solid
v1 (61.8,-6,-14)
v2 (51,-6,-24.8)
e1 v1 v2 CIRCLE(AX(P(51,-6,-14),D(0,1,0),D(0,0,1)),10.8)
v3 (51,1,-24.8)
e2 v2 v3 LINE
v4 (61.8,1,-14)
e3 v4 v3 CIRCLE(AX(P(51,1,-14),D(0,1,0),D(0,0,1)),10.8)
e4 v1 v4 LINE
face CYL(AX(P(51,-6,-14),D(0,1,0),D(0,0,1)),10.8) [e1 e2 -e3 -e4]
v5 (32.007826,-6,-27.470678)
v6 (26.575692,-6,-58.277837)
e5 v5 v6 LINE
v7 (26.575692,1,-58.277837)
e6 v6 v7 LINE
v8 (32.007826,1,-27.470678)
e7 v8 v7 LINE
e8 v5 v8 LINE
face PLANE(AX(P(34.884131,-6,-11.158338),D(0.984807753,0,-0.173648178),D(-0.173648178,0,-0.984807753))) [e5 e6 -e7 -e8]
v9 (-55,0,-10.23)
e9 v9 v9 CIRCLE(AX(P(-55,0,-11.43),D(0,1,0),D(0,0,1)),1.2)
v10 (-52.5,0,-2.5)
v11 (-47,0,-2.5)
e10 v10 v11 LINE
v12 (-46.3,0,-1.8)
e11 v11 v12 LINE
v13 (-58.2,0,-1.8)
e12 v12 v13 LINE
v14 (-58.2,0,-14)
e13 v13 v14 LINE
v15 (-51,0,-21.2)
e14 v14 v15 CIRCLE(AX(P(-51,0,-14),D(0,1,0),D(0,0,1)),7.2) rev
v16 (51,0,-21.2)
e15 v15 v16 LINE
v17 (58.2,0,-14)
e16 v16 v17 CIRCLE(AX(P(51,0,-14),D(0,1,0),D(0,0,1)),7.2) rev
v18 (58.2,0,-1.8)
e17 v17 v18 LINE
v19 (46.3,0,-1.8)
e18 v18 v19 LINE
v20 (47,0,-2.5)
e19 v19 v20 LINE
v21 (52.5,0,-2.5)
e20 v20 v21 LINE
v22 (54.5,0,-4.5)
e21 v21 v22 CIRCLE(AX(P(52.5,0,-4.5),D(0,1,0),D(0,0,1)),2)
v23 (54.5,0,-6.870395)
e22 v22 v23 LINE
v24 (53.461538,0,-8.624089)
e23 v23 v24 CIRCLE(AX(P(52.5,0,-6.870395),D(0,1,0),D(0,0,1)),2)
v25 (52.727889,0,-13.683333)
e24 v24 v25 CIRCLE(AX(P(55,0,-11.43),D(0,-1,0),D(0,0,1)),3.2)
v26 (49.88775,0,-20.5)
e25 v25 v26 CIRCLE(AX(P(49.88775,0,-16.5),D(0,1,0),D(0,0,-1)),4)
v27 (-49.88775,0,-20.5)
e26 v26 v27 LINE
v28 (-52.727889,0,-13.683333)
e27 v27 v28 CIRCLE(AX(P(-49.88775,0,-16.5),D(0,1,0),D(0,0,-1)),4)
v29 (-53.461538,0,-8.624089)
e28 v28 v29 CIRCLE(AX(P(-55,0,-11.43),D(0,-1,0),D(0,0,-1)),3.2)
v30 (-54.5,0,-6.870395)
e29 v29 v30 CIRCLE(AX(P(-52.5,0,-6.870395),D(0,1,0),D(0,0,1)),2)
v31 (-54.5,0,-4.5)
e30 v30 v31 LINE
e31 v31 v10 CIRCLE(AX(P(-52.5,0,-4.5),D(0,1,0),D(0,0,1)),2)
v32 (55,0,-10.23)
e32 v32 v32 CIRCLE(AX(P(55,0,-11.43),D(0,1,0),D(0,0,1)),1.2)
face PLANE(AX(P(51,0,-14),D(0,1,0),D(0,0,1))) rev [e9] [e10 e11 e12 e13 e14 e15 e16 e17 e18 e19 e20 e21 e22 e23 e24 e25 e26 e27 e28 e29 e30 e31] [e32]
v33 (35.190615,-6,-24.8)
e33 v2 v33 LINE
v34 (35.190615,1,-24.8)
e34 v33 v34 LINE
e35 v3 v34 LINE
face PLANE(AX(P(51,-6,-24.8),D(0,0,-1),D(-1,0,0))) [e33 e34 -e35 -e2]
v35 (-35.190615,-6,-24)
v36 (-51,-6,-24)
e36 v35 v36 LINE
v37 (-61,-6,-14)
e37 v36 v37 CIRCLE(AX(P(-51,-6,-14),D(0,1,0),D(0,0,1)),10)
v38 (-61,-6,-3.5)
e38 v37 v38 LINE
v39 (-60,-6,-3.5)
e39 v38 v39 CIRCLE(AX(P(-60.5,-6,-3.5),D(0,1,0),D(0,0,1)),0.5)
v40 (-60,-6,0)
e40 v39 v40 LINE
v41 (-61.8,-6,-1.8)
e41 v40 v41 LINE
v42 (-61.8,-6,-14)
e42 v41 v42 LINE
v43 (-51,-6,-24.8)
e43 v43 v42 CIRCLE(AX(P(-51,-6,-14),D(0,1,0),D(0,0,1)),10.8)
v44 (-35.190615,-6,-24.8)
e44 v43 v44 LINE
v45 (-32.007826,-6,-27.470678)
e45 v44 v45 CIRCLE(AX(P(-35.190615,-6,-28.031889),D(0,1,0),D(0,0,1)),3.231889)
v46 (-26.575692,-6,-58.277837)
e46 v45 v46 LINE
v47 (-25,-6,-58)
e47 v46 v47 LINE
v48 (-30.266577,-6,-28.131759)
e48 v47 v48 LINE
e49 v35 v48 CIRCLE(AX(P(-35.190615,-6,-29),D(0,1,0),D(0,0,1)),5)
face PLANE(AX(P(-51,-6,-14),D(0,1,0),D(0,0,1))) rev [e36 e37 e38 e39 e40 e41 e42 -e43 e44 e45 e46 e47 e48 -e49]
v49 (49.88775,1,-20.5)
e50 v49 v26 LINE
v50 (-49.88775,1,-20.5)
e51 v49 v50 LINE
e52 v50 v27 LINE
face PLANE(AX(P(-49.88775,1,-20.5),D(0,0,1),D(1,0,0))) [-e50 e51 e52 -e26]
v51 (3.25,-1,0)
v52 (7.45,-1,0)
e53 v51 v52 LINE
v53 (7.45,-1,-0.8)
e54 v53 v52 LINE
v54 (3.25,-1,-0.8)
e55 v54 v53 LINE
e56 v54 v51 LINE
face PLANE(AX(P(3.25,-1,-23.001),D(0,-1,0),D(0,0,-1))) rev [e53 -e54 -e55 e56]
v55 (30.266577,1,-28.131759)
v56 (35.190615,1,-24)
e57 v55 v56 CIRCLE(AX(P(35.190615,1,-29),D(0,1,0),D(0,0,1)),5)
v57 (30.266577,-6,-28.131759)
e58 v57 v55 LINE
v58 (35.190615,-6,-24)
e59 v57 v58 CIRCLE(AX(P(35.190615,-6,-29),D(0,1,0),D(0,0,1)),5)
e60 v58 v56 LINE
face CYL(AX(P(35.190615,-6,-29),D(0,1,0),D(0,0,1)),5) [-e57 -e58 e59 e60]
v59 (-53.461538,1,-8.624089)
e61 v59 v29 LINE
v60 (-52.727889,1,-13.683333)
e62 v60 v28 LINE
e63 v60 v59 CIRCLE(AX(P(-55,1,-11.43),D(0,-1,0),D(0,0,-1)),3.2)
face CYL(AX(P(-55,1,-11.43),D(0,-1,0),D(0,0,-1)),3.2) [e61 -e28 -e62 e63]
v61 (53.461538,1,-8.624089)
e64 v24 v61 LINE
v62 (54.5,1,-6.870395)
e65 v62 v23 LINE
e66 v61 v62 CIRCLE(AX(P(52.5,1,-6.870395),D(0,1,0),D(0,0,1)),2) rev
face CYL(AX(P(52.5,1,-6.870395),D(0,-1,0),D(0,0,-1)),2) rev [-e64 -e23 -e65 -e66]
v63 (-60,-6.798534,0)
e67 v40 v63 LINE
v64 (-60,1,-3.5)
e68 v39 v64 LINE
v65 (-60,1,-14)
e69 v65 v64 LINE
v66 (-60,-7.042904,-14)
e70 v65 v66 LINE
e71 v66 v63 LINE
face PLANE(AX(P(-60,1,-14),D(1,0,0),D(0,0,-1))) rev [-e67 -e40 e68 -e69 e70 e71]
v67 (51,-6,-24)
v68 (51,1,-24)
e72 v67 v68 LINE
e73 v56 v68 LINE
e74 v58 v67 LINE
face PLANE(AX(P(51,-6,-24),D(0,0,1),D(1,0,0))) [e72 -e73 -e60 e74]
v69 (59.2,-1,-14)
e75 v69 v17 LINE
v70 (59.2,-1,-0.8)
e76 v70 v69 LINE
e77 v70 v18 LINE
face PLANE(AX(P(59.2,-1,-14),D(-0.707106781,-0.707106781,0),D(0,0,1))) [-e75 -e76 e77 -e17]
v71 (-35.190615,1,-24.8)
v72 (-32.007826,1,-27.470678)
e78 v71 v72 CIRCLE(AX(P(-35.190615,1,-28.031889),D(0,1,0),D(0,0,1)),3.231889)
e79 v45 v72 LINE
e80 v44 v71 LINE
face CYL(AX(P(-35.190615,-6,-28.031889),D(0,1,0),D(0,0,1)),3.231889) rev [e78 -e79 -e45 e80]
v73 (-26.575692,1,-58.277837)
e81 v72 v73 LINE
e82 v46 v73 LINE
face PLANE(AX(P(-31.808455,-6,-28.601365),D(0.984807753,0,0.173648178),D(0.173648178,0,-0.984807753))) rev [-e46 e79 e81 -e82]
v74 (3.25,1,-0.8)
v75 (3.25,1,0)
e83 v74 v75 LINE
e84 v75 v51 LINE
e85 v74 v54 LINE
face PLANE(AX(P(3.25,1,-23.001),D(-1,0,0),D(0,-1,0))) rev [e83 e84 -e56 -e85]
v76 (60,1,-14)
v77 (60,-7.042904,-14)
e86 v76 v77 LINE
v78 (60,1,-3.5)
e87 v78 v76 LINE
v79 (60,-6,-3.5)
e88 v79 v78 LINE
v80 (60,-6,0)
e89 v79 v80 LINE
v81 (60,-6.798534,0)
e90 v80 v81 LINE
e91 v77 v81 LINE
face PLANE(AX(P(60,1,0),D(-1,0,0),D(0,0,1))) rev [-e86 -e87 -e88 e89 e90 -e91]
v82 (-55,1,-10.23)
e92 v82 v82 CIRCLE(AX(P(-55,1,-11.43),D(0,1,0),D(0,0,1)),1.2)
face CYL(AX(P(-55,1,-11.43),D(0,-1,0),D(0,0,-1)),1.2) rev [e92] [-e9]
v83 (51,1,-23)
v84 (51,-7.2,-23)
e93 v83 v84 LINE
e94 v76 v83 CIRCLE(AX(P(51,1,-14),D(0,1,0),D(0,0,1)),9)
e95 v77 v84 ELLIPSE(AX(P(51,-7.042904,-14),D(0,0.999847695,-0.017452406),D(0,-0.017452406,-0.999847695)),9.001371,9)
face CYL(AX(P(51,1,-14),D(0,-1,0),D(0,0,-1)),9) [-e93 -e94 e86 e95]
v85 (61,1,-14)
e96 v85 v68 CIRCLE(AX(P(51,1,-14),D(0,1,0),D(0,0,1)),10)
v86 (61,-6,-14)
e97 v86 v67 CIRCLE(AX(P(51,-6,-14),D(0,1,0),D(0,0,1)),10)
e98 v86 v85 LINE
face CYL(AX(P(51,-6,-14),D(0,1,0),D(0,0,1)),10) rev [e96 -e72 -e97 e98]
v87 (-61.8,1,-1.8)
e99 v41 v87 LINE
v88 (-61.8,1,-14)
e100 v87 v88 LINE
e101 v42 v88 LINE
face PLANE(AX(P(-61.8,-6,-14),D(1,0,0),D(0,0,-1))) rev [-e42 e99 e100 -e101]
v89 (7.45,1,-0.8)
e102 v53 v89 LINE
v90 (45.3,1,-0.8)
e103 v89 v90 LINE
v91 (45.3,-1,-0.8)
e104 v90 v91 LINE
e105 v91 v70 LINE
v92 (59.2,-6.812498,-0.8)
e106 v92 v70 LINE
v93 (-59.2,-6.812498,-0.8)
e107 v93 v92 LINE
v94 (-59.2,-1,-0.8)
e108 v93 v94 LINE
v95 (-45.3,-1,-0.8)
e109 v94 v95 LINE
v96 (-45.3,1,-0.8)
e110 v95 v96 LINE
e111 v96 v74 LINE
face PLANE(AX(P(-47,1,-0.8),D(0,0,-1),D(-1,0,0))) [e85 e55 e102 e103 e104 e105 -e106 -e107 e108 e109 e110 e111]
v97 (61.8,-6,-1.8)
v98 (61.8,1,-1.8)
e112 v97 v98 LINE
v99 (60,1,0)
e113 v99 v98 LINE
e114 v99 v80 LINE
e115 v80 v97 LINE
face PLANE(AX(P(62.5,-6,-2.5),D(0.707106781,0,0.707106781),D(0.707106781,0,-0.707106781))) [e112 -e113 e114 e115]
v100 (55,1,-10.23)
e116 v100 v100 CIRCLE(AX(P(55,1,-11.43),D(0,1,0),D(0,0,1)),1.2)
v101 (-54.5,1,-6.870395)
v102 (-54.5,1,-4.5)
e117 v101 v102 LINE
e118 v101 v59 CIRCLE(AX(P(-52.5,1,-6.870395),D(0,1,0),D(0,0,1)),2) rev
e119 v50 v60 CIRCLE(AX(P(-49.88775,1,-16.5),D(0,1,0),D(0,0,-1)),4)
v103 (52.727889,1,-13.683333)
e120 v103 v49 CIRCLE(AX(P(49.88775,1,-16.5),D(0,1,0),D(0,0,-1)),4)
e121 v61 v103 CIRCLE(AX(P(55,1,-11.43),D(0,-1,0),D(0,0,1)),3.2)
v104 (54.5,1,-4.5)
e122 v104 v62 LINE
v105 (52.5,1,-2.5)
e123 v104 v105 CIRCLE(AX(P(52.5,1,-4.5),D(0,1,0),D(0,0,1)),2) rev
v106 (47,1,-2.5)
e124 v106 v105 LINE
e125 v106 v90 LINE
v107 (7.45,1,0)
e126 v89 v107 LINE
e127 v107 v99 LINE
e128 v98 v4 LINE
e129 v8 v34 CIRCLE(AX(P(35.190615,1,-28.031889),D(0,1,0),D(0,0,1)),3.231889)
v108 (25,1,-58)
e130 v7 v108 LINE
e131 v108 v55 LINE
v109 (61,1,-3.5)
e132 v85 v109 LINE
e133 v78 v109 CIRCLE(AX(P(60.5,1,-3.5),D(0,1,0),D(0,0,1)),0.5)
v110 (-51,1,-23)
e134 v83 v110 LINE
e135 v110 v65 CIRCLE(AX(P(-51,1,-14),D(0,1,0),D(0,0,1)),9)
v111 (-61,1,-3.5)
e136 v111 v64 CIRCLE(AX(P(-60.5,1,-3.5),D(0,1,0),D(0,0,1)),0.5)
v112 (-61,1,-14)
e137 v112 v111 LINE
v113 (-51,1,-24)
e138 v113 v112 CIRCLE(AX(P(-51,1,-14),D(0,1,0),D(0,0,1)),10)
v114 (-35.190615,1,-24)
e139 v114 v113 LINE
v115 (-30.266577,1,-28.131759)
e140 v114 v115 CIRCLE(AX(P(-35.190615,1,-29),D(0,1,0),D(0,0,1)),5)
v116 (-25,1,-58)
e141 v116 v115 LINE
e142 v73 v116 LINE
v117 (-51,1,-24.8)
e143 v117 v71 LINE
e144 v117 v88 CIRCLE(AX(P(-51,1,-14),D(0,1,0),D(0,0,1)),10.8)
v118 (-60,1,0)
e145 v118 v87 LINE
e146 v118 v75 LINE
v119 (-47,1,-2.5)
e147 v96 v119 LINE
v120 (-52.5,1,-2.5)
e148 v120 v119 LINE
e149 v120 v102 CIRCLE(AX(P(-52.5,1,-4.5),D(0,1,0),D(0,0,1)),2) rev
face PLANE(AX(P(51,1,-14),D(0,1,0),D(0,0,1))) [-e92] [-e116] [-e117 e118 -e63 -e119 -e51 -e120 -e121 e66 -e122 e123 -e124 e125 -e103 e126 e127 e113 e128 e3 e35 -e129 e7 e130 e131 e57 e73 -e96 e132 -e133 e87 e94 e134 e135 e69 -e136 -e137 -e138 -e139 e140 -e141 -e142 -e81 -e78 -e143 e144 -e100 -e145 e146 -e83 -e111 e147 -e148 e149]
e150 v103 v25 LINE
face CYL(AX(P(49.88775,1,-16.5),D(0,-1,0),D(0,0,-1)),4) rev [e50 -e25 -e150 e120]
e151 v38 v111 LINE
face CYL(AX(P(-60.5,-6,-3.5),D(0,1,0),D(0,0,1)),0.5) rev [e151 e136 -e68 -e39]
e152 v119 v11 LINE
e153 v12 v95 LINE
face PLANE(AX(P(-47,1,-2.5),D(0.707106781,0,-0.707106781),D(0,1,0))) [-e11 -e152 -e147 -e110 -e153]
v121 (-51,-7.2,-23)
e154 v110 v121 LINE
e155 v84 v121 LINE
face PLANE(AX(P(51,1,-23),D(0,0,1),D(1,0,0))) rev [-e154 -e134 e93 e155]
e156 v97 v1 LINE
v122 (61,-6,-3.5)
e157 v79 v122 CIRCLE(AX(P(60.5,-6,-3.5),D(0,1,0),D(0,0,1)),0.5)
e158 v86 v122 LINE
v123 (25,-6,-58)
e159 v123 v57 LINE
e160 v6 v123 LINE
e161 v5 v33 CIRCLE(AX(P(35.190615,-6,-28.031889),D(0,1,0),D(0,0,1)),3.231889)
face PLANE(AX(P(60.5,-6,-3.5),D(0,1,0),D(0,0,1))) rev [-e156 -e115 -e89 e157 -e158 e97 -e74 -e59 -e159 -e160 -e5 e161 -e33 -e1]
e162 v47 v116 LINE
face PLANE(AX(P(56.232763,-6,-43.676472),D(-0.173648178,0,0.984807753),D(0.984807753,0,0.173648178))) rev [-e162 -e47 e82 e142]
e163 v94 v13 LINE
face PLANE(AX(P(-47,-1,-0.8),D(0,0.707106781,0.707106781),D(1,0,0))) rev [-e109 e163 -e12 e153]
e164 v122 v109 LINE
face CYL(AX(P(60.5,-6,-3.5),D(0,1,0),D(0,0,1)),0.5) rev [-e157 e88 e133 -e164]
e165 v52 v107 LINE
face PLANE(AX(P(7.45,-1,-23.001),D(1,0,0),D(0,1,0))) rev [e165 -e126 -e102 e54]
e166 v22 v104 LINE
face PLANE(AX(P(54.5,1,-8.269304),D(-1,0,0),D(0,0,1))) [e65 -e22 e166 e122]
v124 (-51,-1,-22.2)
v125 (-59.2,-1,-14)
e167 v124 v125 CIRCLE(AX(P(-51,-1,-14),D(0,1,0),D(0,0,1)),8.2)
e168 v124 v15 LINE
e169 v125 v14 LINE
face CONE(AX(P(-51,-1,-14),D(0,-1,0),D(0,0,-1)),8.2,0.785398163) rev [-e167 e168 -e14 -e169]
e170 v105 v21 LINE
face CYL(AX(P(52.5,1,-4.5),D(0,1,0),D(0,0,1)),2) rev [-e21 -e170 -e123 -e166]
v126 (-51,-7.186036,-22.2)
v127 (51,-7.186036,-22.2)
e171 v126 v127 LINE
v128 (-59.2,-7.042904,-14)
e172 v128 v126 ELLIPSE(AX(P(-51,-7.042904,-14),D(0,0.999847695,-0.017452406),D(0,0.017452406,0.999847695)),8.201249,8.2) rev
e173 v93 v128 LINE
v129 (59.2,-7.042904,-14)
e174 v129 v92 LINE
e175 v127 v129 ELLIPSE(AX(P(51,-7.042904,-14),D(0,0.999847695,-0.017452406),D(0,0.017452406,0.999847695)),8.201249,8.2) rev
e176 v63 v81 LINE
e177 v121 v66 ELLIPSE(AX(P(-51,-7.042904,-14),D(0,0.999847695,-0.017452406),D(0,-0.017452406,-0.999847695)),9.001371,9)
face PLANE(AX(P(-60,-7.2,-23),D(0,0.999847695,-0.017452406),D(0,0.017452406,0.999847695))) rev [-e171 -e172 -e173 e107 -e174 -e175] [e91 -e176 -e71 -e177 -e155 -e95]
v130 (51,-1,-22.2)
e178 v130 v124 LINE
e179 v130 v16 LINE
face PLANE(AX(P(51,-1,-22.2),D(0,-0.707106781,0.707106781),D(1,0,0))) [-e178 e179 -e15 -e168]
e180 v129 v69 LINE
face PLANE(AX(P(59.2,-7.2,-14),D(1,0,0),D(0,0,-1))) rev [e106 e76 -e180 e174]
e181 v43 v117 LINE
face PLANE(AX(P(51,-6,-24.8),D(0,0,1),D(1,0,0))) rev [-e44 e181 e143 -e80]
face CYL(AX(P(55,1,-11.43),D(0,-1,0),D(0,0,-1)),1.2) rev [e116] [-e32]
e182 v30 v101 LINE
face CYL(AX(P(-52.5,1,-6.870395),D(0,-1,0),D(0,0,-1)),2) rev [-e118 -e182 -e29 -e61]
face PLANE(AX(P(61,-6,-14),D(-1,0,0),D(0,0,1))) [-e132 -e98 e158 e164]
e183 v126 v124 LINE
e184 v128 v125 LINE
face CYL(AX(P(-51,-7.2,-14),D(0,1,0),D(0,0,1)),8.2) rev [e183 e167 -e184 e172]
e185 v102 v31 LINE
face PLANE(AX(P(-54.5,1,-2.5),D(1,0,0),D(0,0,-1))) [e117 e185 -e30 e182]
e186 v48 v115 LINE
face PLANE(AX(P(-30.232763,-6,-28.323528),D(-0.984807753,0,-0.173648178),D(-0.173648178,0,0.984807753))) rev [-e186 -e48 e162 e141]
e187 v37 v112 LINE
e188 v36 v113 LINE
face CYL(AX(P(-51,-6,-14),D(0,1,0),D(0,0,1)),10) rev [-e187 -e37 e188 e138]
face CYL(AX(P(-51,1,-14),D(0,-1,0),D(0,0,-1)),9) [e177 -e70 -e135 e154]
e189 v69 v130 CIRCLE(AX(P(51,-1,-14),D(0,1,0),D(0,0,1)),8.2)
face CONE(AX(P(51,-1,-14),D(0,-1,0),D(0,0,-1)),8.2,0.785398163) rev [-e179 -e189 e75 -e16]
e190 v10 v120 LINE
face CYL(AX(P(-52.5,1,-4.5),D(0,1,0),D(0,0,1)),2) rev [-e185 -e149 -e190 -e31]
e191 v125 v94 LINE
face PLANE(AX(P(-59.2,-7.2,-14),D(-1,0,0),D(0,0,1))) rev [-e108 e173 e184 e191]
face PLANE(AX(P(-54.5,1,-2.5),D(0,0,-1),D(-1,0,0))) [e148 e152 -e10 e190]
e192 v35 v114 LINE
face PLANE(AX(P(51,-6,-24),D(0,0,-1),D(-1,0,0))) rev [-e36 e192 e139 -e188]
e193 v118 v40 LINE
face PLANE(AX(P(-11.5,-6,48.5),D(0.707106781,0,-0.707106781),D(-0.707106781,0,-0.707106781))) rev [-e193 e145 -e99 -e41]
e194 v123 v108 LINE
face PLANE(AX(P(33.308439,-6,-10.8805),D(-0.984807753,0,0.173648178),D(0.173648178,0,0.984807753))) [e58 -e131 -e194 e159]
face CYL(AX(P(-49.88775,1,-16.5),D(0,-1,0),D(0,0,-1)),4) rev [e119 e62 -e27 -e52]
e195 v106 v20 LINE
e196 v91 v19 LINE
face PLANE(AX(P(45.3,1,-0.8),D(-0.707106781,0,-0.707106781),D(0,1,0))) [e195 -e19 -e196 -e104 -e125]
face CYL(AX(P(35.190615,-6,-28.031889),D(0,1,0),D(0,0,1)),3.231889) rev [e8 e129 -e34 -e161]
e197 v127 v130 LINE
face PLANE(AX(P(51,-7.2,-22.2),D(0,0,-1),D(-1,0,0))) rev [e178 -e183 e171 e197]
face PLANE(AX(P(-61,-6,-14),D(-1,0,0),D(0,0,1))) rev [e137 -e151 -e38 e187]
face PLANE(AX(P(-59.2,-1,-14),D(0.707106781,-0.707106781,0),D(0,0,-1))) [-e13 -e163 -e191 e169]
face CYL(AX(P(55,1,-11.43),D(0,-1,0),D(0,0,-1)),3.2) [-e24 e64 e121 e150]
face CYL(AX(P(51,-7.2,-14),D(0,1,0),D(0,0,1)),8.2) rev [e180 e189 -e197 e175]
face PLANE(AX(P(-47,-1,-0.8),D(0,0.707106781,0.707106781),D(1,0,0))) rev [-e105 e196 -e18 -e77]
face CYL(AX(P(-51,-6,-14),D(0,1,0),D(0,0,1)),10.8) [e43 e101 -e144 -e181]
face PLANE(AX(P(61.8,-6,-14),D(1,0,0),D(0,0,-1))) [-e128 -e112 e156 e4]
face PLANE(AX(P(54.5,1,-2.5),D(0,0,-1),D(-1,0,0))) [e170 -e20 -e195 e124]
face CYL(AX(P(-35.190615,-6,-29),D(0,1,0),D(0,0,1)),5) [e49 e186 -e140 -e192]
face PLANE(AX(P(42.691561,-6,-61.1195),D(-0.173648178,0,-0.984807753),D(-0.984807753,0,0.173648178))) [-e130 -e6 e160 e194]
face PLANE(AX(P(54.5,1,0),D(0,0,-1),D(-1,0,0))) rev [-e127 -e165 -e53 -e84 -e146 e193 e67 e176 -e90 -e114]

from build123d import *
from build123d.topology import SkipClean

# Parameters (mm, degrees)
SKETCH1_R               = 1.2
BOSS_EXTRUDE1_DEPTH     = 1
BOSS_EXTRUDE2_START     = 7.2
BOSS_EXTRUDE2_DEPTH     = 8.2
CHAMFER1_SIZE           = 1
CUT_EXTRUDE1_DEPTH      = 65.659415401
CUT_EXTRUDE1_DEPTH_BACK = 65.659415401
CUT_EXTRUDE2_REACH      = 66.659
SKETCH11_W              = 4.2
SKETCH11_H              = 2
FILLET1_R               = 2
CHAMFER2_SIZE           = 1.7
BOSS_EXTRUDE3_START     = 1
BOSS_EXTRUDE3_DEPTH     = 7


with BuildPart() as part:
    # Sketch1 → Boss-Extrude1 (new body)
    with BuildSketch(Plane(origin=(0, 0, 0), x_dir=(1, 0, 0), z_dir=(0, 1, 0))):
        with BuildLine():
            Line((-60, 0), (-54.5, 0))
            Line((-54.5, 0), (54.5, 0))
            Line((54.5, 0), (60, 0))
            Line((60, 0), (60, 14))
            ThreePointArc((60, 14), (57.363961031, 20.363961031), (51, 23))
            Line((51, 23), (-51, 23))
            ThreePointArc((-51, 23), (-57.363961031, 20.363961031), (-60, 14))
            Line((-60, 14), (-60, 0))
        make_face()
        with Locations(Location((55, 11.43, 0), (0, 0, 270))):
            Circle(SKETCH1_R, mode=Mode.SUBTRACT)
        with Locations(Location((-55, 11.43, 0), (0, 0, 270))):
            Circle(SKETCH1_R, mode=Mode.SUBTRACT)
        with BuildLine():
            Line((-49.887750006, 20.5), (49.887750006, 20.5))
            ThreePointArc((49.887750006, 20.5), (53.580084408, 18.038397435), (52.727888892, 13.683333333))
            ThreePointArc((52.727888892, 13.683333333), (51.958770192, 10.434549723), (54.5, 8.269303874))
            Line((54.5, 8.269303874), (54.5, 2.5))
            Line((54.5, 2.5), (47, 2.5))
            Line((47, 2.5), (47, 0.8))
            Line((47, 0.8), (-47, 0.8))
            Line((-47, 0.8), (-47, 2.5))
            Line((-47, 2.5), (-54.5, 2.5))
            Line((-54.5, 2.5), (-54.5, 8.269303874))
            ThreePointArc((-54.5, 8.269303874), (-51.958770192, 10.434549723), (-52.727888892, 13.683333333))
            ThreePointArc((-52.727888892, 13.683333333), (-53.580084408, 18.038397435), (-49.887750006, 20.5))
        make_face(mode=Mode.SUBTRACT)
    extrude(amount=BOSS_EXTRUDE1_DEPTH)

    # Sketch8 → Boss-Extrude2 (add)
    with SkipClean():  # the faces are left unmerged after this step: merging them gives an invalid solid
        with BuildSketch(Plane(origin=(0, 0, 0), x_dir=(-1, 0, 0), z_dir=(0, -1, 0)).offset(BOSS_EXTRUDE2_START)):
            with BuildLine():
                Line((60, 0), (60, 14))
                ThreePointArc((60, 14), (57.363961031, 20.363961031), (51, 23))
                Line((51, 23), (-51, 23))
                ThreePointArc((-51, 23), (-57.363961031, 20.363961031), (-60, 14))
                Line((-60, 14), (-60, 0))
                Line((-60, 0), (60, 0))
            make_face()
            with BuildLine():
                Line((-59.2, 0.8), (59.2, 0.8))
                Line((59.2, 0.8), (59.2, 14))
                ThreePointArc((59.2, 14), (56.798275606, 19.798275606), (51, 22.2))
                Line((51, 22.2), (-51, 22.2))
                ThreePointArc((-51, 22.2), (-56.798275606, 19.798275606), (-59.2, 14))
                Line((-59.2, 14), (-59.2, 0.8))
            make_face(mode=Mode.SUBTRACT)
        extrude(amount=-BOSS_EXTRUDE2_DEPTH)
    add(part.part.scale(1), mode=Mode.REPLACE)  # the faces are merged on a copy

    # Chamfer1
    chamfer1_edges = [part.edges().sort_by_distance(p)[0] for p in [
        (-56.798275606, 0, -19.798275606),
        (-59.2, 0, -7.4),
        (0, 0, -22.2),
        (56.798275606, 0, -19.798275606),
        (59.2, 0, -7.4),
        (-53.1, 0, -0.8),
        (53.1, 0, -0.8),
    ]]
    chamfer(chamfer1_edges, length=CHAMFER1_SIZE)

    # Sketch9 → Cut-Extrude1 (cut, two sides: drawn at the far end of the back side and taken through both)
    with BuildSketch(Plane(origin=(0, 0, 0), x_dir=(0, 0, -1), z_dir=(1, 0, 0)).offset(-CUT_EXTRUDE1_DEPTH_BACK)):
        Polygon((-2, -7.2), (23, -7.2), (-2, -6.763623377), align=None)
    extrude(amount=CUT_EXTRUDE1_DEPTH + CUT_EXTRUDE1_DEPTH_BACK, mode=Mode.SUBTRACT)

    # Sketch11 → Cut-Extrude2 (cut, up to next)
    with BuildSketch(Plane.XY, mode=Mode.PRIVATE) as cut_extrude2_sk1:
        with Locations((5.35, 0)):
            Rectangle(SKETCH11_W, SKETCH11_H)
    cut_extrude2_tool1 = extrude(cut_extrude2_sk1.sketch, amount=-CUT_EXTRUDE2_REACH, mode=Mode.PRIVATE) & part.part
    add(cut_extrude2_tool1.solids().sort_by_distance((5.35, 0, 0))[0], mode=Mode.SUBTRACT)

    # Fillet1
    fillet1_edges = [part.edges().sort_by_distance(p)[0] for p in [
        (-54.5, 0.5, -8.269303874),
        (-54.5, 0.5, -2.5),
        (54.5, 0.5, -2.5),
        (54.5, 0.5, -8.269303874),
    ]]
    fillet(fillet1_edges, radius=FILLET1_R)

    # Chamfer2
    # the kernel refuses this chamfer: 1.7 mm, written as the material it adds along each edge
    with BuildSketch(Plane(origin=(-47, -5.37186108, -0.8), x_dir=(0.9996219169112968, 0, 0.02749587661058625), z_dir=(0, 1, 0))) as chamfer2_piece_1_section:
        Polygon((CHAMFER2_SIZE * 0.999621916911, CHAMFER2_SIZE * 0.0274958766106), (-CHAMFER2_SIZE * 0.0274958766106, CHAMFER2_SIZE * 0.999621916911), (0, 0), align=None)
    chamfer2_piece_1 = extrude(amount=6.37186108, mode=Mode.PRIVATE)
    chamfer2_piece_1 = split(chamfer2_piece_1, bisect_by=Plane(origin=(-46.825, 0, -2.15), z_dir=(0, 1, 0)), keep=Keep.TOP, mode=Mode.PRIVATE)
    add(chamfer2_piece_1)
    with BuildSketch(Plane(origin=(-47, -5.37186108, -0.8), x_dir=(0.9996219169112968, 0, 0.02749587661058625), z_dir=(0, 1, 0))) as chamfer2_piece_2_section:
        Polygon((CHAMFER2_SIZE * 0.999621916911, CHAMFER2_SIZE * 0.0274958766106), (-CHAMFER2_SIZE * 0.0274958766106, CHAMFER2_SIZE * 0.999621916911), (0, 0), align=None)
    chamfer2_piece_2 = extrude(amount=10.743722159, mode=Mode.PRIVATE)
    chamfer2_piece_2 = split(chamfer2_piece_2, bisect_by=Plane(origin=(-46.296341463, 0, -1.092682927), z_dir=(0, -1, 0)), keep=Keep.TOP, mode=Mode.PRIVATE)
    chamfer2_piece_2 = split(chamfer2_piece_2, bisect_by=Plane(origin=(-46.296341463, -0.530487805, -1.269512195), z_dir=(0, 0.7071067811865476, 0.7071067811865476)), keep=Keep.TOP, mode=Mode.PRIVATE)
    add(chamfer2_piece_2)
    with BuildSketch(Plane(origin=(47, 1, -0.8), x_dir=(0.02749587661058786, 0, -0.9996219169112968), z_dir=(0, -1, 0))) as chamfer2_piece_3_section:
        Polygon((CHAMFER2_SIZE * 0.999621916911, -CHAMFER2_SIZE * 0.0274958766106), (-CHAMFER2_SIZE * 0.0274958766106, -CHAMFER2_SIZE * 0.999621916911), (0, 0), align=None)
    chamfer2_piece_3 = extrude(amount=6.37186108, mode=Mode.PRIVATE)
    chamfer2_piece_3 = split(chamfer2_piece_3, bisect_by=Plane(origin=(46.417200072, 0.023893659, -1.823893659), z_dir=(0, 0.7071067811865476, 0.7071067811865476)), keep=Keep.TOP, mode=Mode.PRIVATE)
    add(chamfer2_piece_3)
    with BuildSketch(Plane(origin=(47, 5.37186108, -0.8), x_dir=(0.02749587661058786, 0, -0.9996219169112968), z_dir=(0, -1, 0))) as chamfer2_piece_4_section:
        Polygon((CHAMFER2_SIZE * 0.999621916911, -CHAMFER2_SIZE * 0.0274958766106), (-CHAMFER2_SIZE * 0.0274958766106, -CHAMFER2_SIZE * 0.999621916911), (0, 0), align=None)
    chamfer2_piece_4 = extrude(amount=10.743722159, mode=Mode.PRIVATE)
    chamfer2_piece_4 = split(chamfer2_piece_4, bisect_by=Plane(origin=(46.825, 0, -2.15), z_dir=(0, 1, 0)), keep=Keep.TOP, mode=Mode.PRIVATE)
    chamfer2_piece_4 = split(chamfer2_piece_4, bisect_by=Plane(origin=(46.825, 0.2625, -2.0625), z_dir=(0, -0.7071067811865476, -0.7071067811865476)), keep=Keep.TOP, mode=Mode.PRIVATE)
    add(chamfer2_piece_4)

    # Sketch12 → Boss-Extrude3 (add)
    with BuildSketch(Plane(origin=(0, 0, 0), x_dir=(1, 0, 0), z_dir=(0, 1, 0)).offset(BOSS_EXTRUDE3_START)):
        with BuildLine():
            Line((-60, 0), (-61.8, 1.8))
            Line((-61.8, 1.8), (-61.8, 14))
            ThreePointArc((-61.8, 14), (-58.636753237, 21.636753237), (-51, 24.8))
            Line((-51, 24.8), (-35.1906155, 24.8))
            ThreePointArc((-35.1906155, 24.8), (-33.11319707, 25.556118473), (-32.007825811, 27.470677654))
            Line((-32.007825811, 27.470677654), (-26.575692405, 58.277837084))
            Line((-26.575692405, 58.277837084), (-25, 58))
            Line((-25, 58), (-30.266576735, 28.131759112))
            ThreePointArc((-30.266576735, 28.131759112), (-31.976677452, 25.169777784), (-35.1906155, 24))
            Line((-35.1906155, 24), (-51, 24))
            ThreePointArc((-51, 24), (-58.071067812, 21.071067812), (-61, 14))
            Line((-61, 14), (-61, 3.5))
            ThreePointArc((-61, 3.5), (-60.5, 3), (-60, 3.5))
            Line((-60, 3.5), (-60, 0))
        make_face()
    boss_extrude3 = extrude(amount=-BOSS_EXTRUDE3_DEPTH)

    # Mirror2: Boss-Extrude3 across plane
    add(boss_extrude3.mirror(Plane(origin=(0, 0, 0), x_dir=(0, 0, 1), z_dir=(1, 0, 0))))


solid = part.part
